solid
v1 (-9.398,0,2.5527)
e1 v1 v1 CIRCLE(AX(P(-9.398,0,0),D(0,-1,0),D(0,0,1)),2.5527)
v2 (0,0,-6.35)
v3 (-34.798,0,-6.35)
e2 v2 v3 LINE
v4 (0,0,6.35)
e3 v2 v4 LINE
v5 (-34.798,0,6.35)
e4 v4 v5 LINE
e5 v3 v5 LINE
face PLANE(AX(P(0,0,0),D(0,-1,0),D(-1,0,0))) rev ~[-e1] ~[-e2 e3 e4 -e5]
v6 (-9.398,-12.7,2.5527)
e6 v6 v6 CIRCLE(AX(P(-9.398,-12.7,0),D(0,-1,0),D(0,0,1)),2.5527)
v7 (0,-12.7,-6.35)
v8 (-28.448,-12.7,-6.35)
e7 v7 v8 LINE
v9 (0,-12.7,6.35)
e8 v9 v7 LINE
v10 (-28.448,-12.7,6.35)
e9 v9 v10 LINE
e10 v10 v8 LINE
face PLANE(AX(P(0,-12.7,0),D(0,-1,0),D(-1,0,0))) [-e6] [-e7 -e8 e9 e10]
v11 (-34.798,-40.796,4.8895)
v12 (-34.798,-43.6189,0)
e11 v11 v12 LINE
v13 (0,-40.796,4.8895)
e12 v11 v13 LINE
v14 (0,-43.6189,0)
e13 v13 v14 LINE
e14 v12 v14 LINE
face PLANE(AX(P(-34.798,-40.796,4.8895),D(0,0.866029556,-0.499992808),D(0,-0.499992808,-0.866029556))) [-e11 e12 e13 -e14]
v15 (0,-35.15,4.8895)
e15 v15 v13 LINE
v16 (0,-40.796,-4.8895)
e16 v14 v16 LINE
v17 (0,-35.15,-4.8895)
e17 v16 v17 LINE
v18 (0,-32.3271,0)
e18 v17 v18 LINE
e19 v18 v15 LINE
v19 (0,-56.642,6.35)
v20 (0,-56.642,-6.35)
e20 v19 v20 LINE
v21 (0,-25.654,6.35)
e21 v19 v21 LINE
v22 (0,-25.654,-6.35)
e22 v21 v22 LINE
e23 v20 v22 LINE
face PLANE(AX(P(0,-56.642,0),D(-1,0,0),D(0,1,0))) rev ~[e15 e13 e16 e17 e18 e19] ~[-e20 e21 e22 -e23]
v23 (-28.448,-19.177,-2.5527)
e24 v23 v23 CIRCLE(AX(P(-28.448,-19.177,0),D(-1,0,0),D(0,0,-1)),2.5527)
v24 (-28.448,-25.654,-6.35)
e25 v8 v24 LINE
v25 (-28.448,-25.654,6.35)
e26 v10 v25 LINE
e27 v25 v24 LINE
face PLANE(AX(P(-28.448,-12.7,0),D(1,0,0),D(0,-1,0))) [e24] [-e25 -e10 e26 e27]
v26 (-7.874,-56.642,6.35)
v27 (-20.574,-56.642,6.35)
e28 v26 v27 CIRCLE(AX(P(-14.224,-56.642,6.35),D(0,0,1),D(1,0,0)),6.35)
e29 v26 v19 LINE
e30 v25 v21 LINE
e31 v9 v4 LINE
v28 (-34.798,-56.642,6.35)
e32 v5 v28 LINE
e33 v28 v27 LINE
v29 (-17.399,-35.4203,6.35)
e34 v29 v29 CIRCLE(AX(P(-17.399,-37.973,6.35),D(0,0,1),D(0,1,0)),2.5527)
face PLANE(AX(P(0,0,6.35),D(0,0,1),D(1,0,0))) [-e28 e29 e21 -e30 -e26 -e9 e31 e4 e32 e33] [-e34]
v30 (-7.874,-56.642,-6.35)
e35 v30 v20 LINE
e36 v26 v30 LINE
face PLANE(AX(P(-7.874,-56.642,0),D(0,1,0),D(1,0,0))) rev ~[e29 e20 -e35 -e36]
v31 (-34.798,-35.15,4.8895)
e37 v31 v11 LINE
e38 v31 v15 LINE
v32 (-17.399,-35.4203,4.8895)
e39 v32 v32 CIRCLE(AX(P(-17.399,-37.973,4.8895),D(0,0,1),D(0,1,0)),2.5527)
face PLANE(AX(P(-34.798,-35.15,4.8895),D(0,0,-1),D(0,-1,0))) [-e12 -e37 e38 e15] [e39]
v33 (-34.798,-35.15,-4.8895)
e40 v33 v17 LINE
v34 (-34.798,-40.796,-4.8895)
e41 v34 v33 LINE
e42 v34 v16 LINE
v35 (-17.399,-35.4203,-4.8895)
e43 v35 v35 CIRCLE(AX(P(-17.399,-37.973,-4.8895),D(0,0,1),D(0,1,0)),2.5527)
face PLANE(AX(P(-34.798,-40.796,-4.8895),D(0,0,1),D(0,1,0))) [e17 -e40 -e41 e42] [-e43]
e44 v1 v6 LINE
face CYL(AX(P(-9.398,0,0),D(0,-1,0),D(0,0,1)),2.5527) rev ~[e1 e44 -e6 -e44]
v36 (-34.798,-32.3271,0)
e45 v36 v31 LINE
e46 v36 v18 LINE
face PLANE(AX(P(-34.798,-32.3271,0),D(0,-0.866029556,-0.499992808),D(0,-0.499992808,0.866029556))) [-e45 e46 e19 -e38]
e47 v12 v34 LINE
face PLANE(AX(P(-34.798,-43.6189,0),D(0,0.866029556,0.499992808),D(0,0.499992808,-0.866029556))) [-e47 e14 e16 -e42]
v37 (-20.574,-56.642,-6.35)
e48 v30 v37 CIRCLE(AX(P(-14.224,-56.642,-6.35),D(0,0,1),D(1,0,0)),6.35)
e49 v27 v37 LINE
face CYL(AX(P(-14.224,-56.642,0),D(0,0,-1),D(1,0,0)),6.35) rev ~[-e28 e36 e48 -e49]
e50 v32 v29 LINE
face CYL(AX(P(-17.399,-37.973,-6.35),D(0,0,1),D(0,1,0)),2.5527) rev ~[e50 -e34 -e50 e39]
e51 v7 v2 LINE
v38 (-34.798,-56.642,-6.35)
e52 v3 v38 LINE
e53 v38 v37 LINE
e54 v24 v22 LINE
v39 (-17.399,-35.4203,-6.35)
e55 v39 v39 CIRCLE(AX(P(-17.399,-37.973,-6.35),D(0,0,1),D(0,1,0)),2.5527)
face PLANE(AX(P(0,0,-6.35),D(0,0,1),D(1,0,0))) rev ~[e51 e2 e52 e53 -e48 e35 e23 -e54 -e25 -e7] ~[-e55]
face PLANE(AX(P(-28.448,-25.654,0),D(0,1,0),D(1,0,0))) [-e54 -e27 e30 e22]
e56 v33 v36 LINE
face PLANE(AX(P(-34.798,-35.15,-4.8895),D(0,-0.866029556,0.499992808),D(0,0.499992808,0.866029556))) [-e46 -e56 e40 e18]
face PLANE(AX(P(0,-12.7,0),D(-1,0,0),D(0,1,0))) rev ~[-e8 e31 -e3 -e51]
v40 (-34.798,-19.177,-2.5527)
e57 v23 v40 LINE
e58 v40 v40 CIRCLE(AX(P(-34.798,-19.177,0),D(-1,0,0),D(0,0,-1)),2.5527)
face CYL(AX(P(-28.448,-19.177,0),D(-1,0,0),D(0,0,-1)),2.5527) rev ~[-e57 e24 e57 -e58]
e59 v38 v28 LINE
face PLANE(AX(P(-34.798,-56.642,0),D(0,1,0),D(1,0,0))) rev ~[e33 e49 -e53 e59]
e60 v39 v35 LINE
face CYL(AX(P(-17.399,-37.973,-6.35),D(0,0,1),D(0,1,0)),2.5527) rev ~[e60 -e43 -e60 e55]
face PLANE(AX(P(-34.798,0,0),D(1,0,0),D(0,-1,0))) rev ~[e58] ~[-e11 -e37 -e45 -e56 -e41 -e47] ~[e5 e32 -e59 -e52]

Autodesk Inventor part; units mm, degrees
ref_plane "YZ Plane" through (0, 0, 0) normal (1, 0, 0) x (0, 1, 0)
ref_plane "XZ Plane" through (0, 0, 0) normal (0, 1, 0) x (-1, 0, 0)
ref_plane "XY Plane" through (0, 0, 0) normal (0, 0, 1) x (1, 0, 0)
sketch "Sketch1" plane through (0, 0, 0) normal (0, 0, 1) x (1, 0, 0)
  line L0 (0, 0) -> (-34.798, 0)
  line L1 (-34.798, 0) -> (-34.798, -56.642)
  line L2 (0, -12.7) -> (-28.448, -12.7)
  line L3 (-28.448, -12.7) -> (-28.448, -25.654)
  line L4 (-28.448, -25.654) -> (0, -25.654)
  line L5 (0, -56.642) -> (0, -25.654)
  line L6 (0, -12.7) -> (0, 0)
  arc A0 (-7.874, -56.642) -> (-20.574, -56.642) centre (-14.224, -56.642) ccw
  line L7 (-34.798, -56.642) -> (-20.574, -56.642)
  line L8 (-7.874, -56.642) -> (0, -56.642)
  dimension "d0" = 56.642
  dimension "d1" = 34.798
  dimension "d4" = 12.7
  dimension "d5" = 28.448
  dimension "d6" = 12.954
  dimension "d50" = 6.35
  dimension "d51" = 14.224
  dimension "d71" = 56.642
  dimension "d72" = 56.642
extrude "Extrusion4" add sketch "Sketch1" along normal mid plane 12.7
sketch "Sketch9" plane through (-34.798, -56.642, 6.35) normal (-1, 0, 0) x (0, 0, 1)
  line L0 (-12.7, 30.988) -> (0, 30.988) construction
  line L1 (-12.7, 0) -> (-12.7, 6.35) construction
  line L2 (0, 30.988) -> (-12.7, 6.35) construction
  line L3 (0, 6.35) -> (0, 0) construction
  line L4 (0, 6.35) -> (-12.7, 30.988) construction
  line L5 (-6.35, 24.3149) -> (-1.4605, 21.492)
  line L6 (-1.4605, 21.492) -> (-1.4605, 15.846)
  line L7 (-1.4605, 15.846) -> (-6.35, 13.0231)
  line L8 (-6.35, 13.0231) -> (-11.2395, 15.846)
  line L9 (-11.2395, 15.846) -> (-11.2395, 21.492)
  line L10 (-11.2395, 21.492) -> (-6.35, 24.3149)
  line L11 (-12.7, 0) -> (-12.7, 56.642) projected
  point P0 (-6.35, 56.642)
  point P1 (-6.35, 18.669)
  dimension "d61" = 9.779
extrude "Extrusion5" cut sketch "Sketch9" against normal through all
sketch "Sketch10" plane through (0, 0, -6.35) normal (0, 0, -1) x (-1, 0, 0)
  line L0 (34.798, -40.796) -> (0, -40.796) projected
  line L1 (34.798, -35.15) -> (0, -35.15) projected
  line L2 (0, -35.15) -> (34.798, -40.796) construction
  line L3 (34.798, -35.15) -> (0, -35.15) construction
  line L4 (0, -40.796) -> (34.798, -35.15) construction
  point P0 (0, 0)
  point P1 (17.399, -37.973)
hole "Hole6" at (-17.399, -37.973, -6.35) direction (0, 0, 1) diameter 5.1054 end through all clearance for "Flat Head Machine Screw (82)" size "#10" standard "Ansi Unified Screw Threads"
sketch "Sketch11" plane through (-28.448, -25.654, 6.35) normal (1, 0, 0) x (0, 0, -1)
  line L0 (0, -30.988) -> (0, 0) construction
  line L1 (12.7, 12.954) -> (12.7, 0) construction
  line L2 (0, 0) -> (12.7, 12.954) construction
  line L3 (12.7, 12.954) -> (0, 12.954) construction
  line L4 (12.7, 12.954) -> (0, 12.954) construction
  line L5 (0, 12.954) -> (12.7, 0) construction
  point P0 (6.35, 25.654)
  point P1 (6.35, 6.477)
hole "Hole7" at (-28.448, -19.177, 0) direction (-1, 0, 0) diameter 5.1054 end through all clearance for "Flat Head Machine Screw (82)" size "#10" standard "Ansi Unified Screw Threads"
sketch "Sketch12" plane through (-34.798, 0, 6.35) normal (0, 1, 0) x (1, 0, 0)
  line L0 (0, 12.7) -> (0, 0) construction
  point P0 (34.798, 6.35)
  point P1 (25.4, 6.35)
  dimension "d80" = 25.4
hole "Hole8" at (-9.398, 0, 0) direction (0, -1, 0) diameter 5.1054 end up to surface clearance for "Flat Head Machine Screw (82)" size "#10" standard "Ansi Unified Screw Threads"
equation "\"d6\" = slotWidth + printerOffset"
equation "\"d50\" = 0.5 * outsideCylnderDiam"
equation "\"d51\" = centerLineOfCylinder"
equation "\"d52\" = partWidth"
equation "\"d61\" = hexTubing"
equation "\"d62\" = partWidth"
equation "\"centerLineOfCylinder\" = 14.224"
equation "\"slotWidth\" = 12.7"
equation "\"outsideCylnderDiam\" = 12.7"
equation "\"partWidth\" = 12.7"
equation "\"printerOffset\" = 0.254"
equation "\"hexTubing\" = 9.779"
properties part number "vexOverSupportForArm"
